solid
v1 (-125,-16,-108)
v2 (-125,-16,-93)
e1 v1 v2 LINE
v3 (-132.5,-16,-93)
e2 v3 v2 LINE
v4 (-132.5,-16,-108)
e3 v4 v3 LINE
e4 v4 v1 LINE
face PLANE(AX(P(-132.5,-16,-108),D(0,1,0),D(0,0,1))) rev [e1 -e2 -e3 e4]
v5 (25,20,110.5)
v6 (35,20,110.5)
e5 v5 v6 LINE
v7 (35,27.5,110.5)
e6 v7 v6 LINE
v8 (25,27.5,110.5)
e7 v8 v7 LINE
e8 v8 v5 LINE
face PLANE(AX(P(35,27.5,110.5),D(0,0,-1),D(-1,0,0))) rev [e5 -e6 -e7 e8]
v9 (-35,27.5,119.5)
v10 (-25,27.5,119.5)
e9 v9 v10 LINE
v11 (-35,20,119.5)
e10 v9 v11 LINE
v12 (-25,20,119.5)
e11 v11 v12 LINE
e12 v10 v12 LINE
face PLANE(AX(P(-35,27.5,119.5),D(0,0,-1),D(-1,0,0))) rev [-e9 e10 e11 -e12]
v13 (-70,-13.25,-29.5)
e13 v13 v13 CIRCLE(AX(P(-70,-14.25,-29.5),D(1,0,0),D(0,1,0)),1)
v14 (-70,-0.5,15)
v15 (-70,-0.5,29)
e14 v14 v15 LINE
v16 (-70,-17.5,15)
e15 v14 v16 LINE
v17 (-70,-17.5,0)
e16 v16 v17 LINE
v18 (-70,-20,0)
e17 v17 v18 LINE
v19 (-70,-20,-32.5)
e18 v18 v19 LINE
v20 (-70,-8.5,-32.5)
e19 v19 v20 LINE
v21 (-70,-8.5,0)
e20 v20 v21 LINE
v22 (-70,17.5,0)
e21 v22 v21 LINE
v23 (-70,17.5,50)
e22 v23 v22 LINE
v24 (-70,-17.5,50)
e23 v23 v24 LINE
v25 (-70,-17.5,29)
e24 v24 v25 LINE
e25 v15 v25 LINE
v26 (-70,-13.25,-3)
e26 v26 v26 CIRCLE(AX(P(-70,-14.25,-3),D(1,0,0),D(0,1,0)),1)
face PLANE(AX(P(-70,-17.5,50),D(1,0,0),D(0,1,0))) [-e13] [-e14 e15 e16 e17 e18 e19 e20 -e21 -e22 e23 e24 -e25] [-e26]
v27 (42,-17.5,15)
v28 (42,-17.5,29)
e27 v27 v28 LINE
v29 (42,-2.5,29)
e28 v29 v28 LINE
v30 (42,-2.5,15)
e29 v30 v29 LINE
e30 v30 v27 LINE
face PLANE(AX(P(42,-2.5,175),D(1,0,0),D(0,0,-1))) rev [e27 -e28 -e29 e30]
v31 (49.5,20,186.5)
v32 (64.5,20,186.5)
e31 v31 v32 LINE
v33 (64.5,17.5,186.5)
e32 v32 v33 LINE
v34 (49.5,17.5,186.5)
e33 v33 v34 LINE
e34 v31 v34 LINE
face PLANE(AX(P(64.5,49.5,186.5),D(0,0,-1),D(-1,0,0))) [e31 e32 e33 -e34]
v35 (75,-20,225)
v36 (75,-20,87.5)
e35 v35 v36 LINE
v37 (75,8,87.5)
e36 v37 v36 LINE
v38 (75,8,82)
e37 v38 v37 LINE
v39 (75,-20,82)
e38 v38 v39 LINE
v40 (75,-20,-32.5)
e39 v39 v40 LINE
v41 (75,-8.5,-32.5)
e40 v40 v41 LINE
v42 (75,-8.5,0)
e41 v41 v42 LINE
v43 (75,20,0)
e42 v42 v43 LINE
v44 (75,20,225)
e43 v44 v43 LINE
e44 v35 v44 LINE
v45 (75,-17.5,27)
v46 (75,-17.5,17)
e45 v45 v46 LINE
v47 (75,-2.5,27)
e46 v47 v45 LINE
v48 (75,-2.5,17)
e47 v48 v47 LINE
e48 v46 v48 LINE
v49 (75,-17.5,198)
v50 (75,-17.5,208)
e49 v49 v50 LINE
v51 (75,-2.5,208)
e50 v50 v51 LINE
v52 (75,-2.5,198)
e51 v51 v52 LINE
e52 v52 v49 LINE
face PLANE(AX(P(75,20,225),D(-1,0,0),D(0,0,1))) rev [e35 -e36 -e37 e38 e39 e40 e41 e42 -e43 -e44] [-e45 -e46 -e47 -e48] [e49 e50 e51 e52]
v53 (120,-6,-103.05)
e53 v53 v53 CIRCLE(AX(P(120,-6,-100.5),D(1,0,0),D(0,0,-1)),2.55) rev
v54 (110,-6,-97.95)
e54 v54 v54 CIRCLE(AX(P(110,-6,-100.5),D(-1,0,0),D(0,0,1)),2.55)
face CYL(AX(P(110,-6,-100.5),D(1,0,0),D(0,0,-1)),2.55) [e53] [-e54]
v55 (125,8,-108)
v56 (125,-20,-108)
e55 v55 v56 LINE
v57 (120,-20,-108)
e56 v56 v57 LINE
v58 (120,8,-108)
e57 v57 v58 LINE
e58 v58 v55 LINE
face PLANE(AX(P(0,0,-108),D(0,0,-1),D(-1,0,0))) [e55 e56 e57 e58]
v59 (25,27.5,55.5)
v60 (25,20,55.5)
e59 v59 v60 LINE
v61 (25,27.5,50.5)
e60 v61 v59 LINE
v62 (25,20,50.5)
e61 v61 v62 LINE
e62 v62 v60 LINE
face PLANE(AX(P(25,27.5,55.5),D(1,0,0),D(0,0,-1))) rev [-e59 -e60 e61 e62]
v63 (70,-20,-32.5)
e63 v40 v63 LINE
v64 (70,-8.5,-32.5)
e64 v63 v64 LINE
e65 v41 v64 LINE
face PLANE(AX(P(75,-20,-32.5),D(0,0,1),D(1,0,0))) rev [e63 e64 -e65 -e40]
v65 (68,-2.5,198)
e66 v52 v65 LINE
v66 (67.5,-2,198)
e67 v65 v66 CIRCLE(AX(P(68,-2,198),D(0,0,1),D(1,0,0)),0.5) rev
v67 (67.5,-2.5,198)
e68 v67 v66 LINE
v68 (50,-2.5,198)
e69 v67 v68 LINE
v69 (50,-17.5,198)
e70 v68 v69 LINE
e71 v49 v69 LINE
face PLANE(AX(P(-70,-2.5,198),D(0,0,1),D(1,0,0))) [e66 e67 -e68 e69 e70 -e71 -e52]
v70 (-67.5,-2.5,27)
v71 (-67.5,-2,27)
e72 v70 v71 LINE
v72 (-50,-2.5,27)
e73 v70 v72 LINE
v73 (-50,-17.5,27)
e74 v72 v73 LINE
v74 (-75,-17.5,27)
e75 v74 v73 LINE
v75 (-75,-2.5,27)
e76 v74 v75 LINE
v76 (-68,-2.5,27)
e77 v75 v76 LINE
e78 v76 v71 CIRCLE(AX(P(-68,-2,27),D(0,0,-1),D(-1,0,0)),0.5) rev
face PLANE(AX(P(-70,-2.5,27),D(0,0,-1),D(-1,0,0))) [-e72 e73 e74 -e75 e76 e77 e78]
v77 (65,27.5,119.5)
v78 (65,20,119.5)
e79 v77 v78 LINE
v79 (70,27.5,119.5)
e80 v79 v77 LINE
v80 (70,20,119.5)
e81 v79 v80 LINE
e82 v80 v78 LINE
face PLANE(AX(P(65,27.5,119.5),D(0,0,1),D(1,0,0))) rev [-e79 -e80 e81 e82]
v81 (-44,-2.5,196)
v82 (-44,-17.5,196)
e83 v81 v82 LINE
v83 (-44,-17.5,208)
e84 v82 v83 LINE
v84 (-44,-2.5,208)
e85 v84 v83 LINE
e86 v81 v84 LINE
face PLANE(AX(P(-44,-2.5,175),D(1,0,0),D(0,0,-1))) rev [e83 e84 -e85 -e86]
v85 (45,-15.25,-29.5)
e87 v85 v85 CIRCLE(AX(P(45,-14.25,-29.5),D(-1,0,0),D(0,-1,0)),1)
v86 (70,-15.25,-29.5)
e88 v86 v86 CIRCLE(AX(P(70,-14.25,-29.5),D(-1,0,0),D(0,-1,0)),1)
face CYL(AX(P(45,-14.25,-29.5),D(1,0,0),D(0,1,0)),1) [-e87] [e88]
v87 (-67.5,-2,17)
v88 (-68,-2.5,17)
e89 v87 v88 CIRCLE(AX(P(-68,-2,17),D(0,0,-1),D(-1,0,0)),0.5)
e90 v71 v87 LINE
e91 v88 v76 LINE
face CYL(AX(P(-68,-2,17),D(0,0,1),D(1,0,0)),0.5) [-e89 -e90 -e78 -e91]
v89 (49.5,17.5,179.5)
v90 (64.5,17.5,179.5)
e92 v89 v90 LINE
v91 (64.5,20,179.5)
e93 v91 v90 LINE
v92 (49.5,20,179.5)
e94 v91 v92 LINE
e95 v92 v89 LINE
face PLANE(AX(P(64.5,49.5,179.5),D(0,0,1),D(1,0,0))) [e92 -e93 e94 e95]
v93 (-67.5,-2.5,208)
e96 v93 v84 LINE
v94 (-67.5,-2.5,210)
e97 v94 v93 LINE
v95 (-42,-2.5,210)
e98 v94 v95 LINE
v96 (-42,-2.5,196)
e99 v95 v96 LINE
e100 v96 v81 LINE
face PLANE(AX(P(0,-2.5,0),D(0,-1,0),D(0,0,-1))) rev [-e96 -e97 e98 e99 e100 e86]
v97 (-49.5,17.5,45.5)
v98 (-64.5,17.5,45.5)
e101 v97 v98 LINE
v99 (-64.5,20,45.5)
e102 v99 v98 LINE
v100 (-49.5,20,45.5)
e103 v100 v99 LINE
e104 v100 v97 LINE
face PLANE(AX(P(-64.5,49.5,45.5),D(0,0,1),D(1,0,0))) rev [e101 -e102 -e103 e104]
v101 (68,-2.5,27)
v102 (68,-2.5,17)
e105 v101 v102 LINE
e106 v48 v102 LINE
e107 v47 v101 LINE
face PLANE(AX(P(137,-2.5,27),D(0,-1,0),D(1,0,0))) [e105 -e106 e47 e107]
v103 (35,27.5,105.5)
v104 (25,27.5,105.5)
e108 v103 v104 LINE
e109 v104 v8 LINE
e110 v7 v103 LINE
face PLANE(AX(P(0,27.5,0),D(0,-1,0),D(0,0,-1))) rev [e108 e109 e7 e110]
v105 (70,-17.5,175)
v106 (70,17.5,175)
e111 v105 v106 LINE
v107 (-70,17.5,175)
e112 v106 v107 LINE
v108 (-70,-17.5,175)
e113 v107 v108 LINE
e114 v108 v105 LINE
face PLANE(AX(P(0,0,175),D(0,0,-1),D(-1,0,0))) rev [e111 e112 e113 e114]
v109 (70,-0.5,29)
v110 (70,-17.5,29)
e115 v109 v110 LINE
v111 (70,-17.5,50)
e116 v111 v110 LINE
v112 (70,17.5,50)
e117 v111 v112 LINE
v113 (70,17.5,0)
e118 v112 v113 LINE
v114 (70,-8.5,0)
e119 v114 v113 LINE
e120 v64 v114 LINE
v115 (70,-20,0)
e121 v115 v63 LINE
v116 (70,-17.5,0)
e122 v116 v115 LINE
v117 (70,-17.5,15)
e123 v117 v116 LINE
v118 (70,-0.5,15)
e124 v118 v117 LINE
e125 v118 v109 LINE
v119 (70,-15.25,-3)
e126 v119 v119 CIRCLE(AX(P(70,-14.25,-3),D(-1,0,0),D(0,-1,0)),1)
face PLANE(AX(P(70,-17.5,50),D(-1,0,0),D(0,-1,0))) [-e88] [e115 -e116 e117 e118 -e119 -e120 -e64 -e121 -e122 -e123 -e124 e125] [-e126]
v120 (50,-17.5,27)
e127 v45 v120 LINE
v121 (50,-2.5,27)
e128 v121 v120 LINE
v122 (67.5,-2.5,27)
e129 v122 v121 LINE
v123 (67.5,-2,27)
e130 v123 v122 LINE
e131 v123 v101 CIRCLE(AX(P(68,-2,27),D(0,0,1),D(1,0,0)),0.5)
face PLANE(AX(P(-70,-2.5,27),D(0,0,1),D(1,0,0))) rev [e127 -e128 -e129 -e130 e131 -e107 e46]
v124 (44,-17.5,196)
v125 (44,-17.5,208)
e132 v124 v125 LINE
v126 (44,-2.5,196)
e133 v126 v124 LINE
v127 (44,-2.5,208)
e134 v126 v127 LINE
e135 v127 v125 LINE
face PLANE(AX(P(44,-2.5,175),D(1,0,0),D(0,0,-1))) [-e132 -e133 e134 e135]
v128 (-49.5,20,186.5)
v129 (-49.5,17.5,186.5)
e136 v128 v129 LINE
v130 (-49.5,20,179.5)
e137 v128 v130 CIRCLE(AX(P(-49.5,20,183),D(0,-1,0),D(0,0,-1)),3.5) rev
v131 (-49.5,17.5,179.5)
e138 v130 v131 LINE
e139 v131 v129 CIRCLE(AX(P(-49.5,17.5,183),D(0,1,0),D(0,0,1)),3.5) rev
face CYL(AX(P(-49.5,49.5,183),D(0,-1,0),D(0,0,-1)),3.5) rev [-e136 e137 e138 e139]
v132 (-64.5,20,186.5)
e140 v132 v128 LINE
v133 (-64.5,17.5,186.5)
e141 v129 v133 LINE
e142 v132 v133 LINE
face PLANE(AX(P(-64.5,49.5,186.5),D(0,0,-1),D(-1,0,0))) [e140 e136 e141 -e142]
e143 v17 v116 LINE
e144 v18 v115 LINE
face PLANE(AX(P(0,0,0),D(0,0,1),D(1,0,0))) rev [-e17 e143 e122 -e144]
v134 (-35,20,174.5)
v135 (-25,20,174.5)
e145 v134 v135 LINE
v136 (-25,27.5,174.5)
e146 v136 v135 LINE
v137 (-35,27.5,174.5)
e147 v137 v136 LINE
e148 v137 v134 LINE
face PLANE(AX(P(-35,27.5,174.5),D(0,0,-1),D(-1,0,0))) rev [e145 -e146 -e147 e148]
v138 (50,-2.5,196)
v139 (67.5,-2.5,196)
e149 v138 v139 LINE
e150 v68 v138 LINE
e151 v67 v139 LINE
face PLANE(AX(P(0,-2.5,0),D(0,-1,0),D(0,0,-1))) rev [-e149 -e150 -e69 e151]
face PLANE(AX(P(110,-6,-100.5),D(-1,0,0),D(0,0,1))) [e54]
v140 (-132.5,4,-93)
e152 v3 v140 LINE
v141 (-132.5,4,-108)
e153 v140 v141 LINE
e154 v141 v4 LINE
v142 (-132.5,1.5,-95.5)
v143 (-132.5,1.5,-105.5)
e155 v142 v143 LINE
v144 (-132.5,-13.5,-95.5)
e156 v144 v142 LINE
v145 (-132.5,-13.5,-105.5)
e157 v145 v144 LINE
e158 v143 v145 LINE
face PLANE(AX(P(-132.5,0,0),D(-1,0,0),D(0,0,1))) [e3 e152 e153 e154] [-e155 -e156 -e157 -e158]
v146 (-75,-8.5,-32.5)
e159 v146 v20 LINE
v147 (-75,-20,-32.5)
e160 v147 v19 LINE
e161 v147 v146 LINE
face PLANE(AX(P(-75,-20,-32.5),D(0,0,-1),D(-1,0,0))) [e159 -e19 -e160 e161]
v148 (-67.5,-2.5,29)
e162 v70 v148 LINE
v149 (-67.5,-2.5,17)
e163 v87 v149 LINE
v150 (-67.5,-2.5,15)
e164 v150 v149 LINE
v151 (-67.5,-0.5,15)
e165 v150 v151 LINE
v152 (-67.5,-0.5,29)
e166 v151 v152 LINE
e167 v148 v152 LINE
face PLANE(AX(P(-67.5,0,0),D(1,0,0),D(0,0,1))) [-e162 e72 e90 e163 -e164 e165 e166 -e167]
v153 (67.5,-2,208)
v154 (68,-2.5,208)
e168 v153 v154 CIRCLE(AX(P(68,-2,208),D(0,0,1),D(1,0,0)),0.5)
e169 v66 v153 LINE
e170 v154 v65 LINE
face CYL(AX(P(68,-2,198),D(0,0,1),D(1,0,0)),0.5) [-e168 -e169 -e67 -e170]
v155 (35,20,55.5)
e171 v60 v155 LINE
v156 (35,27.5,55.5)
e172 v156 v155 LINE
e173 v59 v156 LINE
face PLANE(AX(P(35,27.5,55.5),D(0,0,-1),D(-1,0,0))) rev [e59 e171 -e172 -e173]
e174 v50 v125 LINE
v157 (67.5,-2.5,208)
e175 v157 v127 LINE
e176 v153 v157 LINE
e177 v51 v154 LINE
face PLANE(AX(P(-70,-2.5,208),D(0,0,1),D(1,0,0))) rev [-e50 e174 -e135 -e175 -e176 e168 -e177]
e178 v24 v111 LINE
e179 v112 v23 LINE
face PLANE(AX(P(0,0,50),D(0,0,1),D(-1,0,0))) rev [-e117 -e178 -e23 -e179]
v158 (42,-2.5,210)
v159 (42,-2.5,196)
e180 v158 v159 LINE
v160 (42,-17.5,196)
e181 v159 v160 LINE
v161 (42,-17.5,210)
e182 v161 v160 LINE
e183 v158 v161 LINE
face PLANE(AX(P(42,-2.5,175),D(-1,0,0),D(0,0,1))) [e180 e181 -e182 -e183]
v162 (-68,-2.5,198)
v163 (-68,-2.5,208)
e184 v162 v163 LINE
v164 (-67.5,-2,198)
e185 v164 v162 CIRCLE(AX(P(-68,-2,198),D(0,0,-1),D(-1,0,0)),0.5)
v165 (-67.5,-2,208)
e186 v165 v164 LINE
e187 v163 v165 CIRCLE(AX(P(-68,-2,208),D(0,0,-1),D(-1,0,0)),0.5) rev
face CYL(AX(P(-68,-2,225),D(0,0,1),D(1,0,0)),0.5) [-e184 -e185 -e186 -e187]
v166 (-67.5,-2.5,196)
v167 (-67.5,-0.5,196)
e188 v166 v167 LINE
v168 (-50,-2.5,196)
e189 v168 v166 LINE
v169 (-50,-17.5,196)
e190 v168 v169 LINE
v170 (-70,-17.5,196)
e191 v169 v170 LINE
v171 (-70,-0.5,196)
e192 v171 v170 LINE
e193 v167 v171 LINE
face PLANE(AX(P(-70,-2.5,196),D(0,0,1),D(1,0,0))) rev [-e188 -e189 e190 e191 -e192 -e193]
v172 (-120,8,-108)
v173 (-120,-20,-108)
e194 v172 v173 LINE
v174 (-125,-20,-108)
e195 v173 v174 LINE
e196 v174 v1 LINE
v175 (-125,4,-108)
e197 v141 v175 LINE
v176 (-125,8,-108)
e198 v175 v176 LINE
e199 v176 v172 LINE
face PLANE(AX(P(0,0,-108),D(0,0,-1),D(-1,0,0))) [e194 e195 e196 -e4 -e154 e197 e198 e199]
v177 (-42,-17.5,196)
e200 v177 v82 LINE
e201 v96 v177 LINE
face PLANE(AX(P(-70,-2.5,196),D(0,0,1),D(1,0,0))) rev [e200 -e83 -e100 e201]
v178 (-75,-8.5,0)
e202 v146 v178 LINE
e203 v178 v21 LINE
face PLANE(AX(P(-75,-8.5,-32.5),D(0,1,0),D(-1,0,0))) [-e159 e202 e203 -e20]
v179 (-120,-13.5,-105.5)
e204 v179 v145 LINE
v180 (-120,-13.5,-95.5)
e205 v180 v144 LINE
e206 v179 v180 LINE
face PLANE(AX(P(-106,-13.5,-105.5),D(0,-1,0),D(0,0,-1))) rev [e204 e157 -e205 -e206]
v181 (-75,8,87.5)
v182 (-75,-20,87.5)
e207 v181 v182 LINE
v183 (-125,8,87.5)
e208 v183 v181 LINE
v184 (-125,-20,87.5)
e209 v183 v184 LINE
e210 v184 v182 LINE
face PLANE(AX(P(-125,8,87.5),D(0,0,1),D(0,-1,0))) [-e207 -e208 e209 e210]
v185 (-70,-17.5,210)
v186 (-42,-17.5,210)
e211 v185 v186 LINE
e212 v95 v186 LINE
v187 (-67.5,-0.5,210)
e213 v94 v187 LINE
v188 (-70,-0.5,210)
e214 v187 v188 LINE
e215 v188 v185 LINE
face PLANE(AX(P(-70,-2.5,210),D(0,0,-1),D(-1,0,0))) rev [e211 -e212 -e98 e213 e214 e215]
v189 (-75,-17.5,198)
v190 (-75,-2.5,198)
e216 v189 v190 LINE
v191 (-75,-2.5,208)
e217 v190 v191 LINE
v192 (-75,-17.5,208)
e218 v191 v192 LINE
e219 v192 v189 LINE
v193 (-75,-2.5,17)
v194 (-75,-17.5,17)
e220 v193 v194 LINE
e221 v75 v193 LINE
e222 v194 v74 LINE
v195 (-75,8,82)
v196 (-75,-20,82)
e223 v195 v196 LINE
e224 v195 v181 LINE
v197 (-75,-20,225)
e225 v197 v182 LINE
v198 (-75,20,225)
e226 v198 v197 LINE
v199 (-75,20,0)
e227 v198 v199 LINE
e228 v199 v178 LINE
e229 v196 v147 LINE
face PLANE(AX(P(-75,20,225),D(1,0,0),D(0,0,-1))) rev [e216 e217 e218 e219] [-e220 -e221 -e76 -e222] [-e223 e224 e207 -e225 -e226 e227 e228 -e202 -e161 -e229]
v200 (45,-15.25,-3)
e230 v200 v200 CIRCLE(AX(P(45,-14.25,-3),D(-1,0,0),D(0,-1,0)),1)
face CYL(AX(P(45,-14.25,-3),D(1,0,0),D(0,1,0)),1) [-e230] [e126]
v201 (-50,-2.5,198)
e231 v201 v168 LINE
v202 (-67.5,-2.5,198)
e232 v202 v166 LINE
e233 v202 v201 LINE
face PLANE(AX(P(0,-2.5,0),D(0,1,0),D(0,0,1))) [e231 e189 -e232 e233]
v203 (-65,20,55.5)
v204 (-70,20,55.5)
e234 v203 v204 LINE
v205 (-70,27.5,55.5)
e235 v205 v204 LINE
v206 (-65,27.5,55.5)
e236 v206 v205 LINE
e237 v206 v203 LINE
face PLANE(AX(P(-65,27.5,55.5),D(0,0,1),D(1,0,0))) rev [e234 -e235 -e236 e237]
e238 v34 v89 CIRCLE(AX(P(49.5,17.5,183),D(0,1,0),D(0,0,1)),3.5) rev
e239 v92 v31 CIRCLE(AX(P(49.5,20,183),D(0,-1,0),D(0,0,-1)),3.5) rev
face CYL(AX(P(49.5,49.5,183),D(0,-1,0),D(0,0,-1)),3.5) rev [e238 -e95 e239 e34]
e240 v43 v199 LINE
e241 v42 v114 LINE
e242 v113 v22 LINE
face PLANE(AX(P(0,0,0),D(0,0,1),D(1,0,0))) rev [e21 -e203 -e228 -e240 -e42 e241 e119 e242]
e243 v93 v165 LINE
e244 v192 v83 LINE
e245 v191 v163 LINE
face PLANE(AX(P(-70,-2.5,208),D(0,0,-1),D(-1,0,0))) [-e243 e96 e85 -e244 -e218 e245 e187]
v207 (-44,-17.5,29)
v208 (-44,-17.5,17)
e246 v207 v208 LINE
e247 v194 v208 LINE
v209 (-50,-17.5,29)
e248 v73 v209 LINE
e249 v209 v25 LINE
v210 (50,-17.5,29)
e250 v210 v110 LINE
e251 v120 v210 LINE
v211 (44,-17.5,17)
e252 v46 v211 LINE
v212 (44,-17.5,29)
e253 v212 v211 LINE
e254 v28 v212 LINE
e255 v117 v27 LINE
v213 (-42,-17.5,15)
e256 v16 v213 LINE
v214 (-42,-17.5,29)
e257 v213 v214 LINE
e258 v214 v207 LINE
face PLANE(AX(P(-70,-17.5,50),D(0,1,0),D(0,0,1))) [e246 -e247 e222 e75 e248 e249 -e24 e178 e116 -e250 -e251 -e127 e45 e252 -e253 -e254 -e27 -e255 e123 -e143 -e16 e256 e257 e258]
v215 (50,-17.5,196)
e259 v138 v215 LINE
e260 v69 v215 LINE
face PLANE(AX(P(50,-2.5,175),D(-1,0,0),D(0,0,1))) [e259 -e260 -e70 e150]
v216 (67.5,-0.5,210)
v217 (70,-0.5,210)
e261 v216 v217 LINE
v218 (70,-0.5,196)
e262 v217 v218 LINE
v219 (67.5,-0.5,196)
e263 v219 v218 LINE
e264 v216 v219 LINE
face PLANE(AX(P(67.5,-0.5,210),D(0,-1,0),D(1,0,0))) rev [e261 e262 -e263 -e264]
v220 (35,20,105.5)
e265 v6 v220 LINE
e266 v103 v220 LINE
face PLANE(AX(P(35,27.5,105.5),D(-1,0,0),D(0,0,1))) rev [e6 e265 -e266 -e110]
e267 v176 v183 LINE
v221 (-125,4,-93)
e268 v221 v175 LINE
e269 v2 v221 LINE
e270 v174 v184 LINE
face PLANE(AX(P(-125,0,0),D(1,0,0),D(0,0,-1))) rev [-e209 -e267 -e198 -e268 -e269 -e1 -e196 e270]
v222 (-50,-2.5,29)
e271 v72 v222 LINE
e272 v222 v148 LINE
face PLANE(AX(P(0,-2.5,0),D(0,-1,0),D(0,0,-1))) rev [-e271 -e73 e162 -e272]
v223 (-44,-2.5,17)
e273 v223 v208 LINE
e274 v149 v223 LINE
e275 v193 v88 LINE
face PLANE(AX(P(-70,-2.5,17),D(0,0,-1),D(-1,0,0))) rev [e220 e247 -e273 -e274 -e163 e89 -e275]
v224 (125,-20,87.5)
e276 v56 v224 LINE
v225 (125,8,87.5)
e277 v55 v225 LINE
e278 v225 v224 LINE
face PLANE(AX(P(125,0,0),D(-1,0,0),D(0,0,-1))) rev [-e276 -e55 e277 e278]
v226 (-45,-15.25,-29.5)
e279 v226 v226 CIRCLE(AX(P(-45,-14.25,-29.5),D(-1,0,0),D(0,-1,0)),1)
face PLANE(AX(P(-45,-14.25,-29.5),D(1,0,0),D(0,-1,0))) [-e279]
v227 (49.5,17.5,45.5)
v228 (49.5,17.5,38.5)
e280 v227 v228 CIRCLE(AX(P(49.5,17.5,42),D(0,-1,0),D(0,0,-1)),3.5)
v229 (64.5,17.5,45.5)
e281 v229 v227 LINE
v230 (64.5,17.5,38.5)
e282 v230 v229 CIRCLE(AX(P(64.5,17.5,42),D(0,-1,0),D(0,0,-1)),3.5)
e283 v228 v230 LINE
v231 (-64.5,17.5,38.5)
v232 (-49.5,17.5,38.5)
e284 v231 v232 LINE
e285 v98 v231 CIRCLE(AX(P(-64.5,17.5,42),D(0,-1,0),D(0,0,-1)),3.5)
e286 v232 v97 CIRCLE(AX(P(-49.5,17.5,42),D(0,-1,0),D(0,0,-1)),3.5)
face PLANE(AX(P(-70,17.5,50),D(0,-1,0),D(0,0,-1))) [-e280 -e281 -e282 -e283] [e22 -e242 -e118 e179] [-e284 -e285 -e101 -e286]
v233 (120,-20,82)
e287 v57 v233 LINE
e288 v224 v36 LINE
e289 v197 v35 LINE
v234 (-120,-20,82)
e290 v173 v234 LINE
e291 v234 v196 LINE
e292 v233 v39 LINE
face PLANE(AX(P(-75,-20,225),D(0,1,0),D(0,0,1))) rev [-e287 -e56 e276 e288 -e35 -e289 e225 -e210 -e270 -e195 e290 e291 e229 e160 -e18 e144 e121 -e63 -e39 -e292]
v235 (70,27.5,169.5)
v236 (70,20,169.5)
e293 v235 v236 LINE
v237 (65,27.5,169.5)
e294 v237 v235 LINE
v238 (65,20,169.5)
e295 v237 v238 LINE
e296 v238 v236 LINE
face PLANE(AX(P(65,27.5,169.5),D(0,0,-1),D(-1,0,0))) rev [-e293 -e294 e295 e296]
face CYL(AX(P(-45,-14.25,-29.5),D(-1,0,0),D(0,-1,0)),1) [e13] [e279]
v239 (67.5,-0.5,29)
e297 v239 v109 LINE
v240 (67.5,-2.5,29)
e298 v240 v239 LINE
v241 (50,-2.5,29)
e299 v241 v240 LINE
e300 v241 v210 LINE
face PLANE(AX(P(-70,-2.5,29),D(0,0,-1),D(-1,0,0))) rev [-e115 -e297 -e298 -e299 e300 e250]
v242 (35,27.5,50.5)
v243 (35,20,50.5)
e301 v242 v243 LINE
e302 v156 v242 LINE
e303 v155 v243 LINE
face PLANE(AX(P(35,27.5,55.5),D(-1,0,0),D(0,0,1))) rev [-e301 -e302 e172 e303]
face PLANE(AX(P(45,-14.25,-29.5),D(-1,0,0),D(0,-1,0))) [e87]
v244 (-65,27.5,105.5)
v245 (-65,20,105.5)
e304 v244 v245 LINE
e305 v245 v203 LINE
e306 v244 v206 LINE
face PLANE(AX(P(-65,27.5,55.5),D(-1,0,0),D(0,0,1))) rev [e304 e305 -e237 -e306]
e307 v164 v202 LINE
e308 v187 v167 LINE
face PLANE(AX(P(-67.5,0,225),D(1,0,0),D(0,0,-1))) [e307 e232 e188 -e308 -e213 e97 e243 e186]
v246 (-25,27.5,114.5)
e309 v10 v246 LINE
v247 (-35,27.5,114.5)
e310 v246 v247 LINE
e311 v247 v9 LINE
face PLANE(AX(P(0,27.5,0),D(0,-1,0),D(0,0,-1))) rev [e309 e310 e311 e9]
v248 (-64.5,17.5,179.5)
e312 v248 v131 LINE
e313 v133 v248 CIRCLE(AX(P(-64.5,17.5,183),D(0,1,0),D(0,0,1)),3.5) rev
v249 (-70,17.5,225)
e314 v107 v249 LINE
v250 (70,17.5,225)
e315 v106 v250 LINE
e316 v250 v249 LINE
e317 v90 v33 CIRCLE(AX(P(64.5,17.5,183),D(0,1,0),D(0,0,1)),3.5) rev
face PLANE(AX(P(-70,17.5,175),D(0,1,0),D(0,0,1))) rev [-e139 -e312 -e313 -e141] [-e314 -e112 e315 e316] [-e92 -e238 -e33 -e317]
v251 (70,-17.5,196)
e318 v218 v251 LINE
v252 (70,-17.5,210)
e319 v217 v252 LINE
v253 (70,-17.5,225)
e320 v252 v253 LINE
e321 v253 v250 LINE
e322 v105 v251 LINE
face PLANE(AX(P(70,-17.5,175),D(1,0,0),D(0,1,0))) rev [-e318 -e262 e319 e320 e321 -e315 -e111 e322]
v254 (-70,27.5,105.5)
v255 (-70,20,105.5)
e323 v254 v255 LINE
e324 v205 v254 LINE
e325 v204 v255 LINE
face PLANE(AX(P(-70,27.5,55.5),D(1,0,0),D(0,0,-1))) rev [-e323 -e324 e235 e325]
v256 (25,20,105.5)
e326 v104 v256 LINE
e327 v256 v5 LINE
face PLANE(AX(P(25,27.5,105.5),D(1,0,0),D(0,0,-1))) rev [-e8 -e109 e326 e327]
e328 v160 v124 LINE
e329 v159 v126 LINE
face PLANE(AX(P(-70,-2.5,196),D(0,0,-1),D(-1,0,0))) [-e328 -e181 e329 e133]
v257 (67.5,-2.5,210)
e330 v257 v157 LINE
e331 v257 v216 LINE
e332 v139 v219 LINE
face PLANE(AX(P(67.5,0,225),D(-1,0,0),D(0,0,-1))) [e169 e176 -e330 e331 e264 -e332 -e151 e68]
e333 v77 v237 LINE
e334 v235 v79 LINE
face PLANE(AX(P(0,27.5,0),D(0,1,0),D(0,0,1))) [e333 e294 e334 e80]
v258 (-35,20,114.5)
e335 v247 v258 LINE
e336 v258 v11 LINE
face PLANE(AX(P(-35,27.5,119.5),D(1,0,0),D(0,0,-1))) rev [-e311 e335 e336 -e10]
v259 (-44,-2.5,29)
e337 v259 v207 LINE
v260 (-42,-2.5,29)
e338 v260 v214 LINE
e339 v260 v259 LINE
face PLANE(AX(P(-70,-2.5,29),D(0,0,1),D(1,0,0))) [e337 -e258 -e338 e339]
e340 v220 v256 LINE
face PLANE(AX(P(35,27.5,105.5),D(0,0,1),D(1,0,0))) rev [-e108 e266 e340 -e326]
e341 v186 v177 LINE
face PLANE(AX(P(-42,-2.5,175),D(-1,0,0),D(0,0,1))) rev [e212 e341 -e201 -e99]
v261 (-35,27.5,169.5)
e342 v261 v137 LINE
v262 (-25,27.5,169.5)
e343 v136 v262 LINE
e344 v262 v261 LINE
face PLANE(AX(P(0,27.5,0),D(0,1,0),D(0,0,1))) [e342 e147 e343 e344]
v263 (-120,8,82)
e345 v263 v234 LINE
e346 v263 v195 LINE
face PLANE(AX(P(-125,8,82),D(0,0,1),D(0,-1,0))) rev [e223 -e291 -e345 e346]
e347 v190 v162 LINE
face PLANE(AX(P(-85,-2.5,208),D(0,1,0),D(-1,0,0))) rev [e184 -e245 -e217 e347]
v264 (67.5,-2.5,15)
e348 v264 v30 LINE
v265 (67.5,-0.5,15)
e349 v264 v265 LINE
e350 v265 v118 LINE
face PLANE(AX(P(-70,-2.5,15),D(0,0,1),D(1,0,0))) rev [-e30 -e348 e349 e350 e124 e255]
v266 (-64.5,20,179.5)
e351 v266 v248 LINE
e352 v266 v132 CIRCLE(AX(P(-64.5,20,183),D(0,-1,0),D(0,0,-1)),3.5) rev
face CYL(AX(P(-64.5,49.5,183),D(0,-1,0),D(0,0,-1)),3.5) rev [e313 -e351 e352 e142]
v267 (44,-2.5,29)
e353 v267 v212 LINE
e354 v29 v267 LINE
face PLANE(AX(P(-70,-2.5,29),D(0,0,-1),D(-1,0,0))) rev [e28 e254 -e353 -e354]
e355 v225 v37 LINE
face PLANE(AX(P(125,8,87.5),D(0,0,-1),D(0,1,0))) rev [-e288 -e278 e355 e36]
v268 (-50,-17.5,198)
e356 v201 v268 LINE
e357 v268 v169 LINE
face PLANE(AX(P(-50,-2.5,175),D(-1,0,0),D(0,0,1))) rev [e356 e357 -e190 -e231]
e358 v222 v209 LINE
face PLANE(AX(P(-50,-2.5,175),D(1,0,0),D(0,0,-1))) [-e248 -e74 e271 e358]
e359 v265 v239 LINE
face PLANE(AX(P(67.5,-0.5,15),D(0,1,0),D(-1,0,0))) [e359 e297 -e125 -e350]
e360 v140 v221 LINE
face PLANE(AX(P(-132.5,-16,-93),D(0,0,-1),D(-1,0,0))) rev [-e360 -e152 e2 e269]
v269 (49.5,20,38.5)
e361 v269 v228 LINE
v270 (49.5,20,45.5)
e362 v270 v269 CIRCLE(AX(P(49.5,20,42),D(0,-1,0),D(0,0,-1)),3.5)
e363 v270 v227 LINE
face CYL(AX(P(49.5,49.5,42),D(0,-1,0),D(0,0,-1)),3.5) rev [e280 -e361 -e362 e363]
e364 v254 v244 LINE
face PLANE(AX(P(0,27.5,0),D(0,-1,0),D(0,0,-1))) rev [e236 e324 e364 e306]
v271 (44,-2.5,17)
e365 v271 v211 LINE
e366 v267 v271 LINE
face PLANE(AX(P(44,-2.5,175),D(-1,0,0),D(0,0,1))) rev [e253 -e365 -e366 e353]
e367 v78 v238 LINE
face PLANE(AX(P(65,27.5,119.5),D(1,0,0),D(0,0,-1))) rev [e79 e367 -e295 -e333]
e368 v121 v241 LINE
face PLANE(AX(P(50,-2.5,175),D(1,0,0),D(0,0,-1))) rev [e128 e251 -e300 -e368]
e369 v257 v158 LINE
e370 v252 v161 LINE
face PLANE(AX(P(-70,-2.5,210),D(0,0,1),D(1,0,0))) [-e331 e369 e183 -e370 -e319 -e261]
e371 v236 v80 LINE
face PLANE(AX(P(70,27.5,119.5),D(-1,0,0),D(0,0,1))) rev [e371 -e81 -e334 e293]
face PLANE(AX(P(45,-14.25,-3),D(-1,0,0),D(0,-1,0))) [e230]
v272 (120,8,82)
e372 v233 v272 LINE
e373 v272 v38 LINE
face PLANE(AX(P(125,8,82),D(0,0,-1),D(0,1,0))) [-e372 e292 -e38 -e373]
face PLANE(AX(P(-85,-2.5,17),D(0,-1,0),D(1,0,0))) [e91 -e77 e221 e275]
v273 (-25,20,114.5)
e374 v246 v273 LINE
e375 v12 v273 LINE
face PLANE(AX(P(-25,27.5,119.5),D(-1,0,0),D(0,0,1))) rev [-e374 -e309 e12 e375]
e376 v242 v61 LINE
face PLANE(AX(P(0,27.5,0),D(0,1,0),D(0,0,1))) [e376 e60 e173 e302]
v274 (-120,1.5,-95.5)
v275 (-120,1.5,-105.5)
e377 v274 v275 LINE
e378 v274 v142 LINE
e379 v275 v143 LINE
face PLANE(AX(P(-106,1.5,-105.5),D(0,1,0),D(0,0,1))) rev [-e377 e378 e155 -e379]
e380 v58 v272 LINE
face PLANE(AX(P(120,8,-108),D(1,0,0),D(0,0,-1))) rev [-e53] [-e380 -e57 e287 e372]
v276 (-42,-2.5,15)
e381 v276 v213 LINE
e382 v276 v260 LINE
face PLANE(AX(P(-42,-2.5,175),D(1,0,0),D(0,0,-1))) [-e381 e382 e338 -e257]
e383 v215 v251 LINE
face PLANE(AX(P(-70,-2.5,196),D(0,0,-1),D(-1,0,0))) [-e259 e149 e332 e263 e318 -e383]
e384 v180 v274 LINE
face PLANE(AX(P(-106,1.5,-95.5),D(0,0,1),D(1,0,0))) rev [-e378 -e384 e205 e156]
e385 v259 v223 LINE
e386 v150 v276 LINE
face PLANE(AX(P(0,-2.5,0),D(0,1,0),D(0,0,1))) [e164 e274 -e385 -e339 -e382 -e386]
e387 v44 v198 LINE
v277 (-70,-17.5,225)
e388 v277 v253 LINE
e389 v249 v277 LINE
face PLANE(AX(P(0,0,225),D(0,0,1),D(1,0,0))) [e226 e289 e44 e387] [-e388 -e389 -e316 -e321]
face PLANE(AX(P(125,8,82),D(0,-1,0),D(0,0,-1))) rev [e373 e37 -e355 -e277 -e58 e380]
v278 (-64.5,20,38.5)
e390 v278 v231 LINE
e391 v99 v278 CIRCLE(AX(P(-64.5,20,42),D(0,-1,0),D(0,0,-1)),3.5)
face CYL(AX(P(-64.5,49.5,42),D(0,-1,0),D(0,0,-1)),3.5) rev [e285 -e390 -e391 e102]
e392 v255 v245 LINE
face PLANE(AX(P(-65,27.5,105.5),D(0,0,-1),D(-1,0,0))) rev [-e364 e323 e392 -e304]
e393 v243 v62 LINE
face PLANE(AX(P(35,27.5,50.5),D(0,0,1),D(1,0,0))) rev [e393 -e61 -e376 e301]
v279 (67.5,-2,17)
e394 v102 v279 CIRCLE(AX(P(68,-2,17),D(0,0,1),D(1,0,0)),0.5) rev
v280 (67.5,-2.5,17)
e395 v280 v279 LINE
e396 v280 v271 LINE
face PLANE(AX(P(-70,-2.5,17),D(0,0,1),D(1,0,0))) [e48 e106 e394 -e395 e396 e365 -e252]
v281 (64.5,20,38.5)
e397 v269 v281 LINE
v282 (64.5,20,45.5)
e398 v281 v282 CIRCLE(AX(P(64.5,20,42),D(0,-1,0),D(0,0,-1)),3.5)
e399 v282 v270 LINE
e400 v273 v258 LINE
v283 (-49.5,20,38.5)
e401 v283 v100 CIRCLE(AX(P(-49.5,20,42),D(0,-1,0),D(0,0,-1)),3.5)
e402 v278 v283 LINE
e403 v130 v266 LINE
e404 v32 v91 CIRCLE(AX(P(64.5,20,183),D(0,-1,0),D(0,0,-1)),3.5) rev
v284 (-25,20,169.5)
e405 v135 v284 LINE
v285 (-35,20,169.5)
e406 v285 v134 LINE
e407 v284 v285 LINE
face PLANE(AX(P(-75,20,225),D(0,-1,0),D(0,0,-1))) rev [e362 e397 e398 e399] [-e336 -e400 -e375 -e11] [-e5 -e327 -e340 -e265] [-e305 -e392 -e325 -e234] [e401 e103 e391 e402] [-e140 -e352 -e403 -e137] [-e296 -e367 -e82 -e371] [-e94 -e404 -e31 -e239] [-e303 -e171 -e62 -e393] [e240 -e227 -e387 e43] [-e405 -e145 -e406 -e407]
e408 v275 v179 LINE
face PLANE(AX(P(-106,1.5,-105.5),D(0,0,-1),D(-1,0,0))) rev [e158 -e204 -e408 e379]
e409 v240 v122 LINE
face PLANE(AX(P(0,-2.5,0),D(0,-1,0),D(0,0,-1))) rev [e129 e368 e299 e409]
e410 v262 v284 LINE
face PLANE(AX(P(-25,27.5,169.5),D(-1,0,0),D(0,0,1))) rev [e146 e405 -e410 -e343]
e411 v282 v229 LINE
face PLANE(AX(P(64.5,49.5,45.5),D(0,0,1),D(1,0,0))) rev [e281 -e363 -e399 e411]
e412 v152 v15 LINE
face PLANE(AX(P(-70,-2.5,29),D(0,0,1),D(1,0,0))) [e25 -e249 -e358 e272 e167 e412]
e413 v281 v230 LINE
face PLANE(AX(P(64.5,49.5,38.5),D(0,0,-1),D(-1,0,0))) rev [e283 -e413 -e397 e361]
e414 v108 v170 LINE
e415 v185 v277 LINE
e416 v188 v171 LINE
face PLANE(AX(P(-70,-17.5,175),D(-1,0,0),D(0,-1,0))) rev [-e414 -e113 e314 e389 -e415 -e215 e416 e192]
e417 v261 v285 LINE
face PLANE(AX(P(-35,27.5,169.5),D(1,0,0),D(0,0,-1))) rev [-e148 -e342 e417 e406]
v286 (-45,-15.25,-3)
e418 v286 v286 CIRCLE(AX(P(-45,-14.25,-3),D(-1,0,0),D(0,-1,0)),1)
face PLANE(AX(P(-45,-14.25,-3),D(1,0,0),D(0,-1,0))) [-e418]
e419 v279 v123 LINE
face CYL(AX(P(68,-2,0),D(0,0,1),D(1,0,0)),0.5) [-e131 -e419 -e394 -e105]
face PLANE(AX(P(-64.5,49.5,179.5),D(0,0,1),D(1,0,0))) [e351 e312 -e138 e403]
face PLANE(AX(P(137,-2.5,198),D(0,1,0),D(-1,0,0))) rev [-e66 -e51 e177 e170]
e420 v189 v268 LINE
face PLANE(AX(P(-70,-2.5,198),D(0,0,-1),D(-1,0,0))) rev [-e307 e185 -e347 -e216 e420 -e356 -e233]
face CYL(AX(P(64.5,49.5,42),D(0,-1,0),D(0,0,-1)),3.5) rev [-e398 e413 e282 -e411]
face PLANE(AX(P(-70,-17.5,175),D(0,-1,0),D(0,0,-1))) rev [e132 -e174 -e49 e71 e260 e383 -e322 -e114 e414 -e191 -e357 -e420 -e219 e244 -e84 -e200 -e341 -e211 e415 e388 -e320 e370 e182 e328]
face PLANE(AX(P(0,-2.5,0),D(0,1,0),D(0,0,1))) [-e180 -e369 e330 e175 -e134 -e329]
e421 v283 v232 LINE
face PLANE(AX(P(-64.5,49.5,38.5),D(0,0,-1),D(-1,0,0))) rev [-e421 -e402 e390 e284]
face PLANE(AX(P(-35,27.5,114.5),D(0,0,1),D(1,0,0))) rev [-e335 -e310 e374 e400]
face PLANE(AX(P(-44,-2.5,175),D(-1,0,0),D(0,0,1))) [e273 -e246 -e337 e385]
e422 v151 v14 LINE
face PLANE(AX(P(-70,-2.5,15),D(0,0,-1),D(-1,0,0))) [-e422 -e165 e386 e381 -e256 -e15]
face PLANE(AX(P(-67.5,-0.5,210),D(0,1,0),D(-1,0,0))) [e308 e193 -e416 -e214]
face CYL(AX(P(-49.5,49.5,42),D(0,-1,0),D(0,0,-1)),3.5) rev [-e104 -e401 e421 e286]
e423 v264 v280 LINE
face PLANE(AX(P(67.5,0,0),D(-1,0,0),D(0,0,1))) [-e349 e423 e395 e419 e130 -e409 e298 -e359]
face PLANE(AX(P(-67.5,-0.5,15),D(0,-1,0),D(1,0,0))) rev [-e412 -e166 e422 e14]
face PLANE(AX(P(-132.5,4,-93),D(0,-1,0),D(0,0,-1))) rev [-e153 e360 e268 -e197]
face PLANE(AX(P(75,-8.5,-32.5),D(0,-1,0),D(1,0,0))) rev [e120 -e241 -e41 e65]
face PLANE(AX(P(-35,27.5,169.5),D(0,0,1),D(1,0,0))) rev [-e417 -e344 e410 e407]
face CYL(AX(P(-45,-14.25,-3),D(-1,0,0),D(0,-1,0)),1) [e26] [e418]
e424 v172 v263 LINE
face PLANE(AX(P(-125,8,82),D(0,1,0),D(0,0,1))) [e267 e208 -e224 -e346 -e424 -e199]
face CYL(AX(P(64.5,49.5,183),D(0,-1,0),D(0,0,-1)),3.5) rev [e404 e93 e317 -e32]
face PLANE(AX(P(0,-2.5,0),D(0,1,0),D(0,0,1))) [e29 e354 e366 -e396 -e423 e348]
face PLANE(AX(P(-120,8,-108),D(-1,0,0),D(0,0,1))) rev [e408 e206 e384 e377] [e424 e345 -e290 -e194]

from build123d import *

# Parameters (mm, degrees)
SKETCH2_W            = 150
SKETCH2_H            = 40
BOSS_EXTRUDE1_DEPTH  = 225
SKETCH3_W            = 140
SKETCH3_H            = 35
CUT_EXTRUDE1_DEPTH   = 50
SKETCH4_W            = 26
SKETCH4_H            = 2
SKETCH4_W_2          = 20
BOSS_EXTRUDE2_DEPTH  = 15
SKETCH6_W            = 10
SKETCH6_H            = 15
CUT_EXTRUDE2_DEPTH   = 15
CUT_EXTRUDE3_DEPTH   = 67
SKETCH9_W            = 10
SKETCH9_H            = 15
CUT_EXTRUDE4_DEPTH   = 67
SKETCH12_W           = 14
SKETCH12_H           = 2
BOSS_EXTRUDE3_DEPTH  = 2.5
FILLET1_R            = 0.5
MIRROR3_START        = 196
MIRROR3_DEPTH        = 14
MIRROR3_START_2      = 15
MIRROR3_2_DEPTH      = 14
MIRROR3_3_DEPTH      = 2
MIRROR3_START_3      = 208
MIRROR3_4_DEPTH      = 2
MIRROR3_5_DEPTH      = 2
MIRROR3_START_4      = 27
MIRROR3_6_DEPTH      = 2
SKETCH16_W           = 32.5
SKETCH16_H           = 11.5
BOSS_EXTRUDE5_DEPTH  = 5
SKETCH17_R           = 1
BOSS_EXTRUDE7_DEPTH  = 25
SKETCH18_W           = 5
SKETCH18_H           = 50
SKETCH18_W_2         = 10
SKETCH18_H_2         = 5
BOSS_EXTRUDE8_DEPTH  = 7.5
SKETCH24_W           = 5.5
SKETCH24_H           = 28
BOSS_EXTRUDE11_DEPTH = 50
SKETCH25_W           = 5
SKETCH25_H           = 28
BOSS_EXTRUDE12_DEPTH = 190
SKETCH26_W           = 5
SKETCH26_H           = 28
BOSS_EXTRUDE13_DEPTH = 190
SKETCH27_R           = 2.55
BOSS_EXTRUDE14_DEPTH = 10
SKETCH29_W           = 10
SKETCH29_H           = 15
CUT_EXTRUDE5_DEPTH   = 19
SKETCH30_W           = 15
SKETCH30_H           = 20
BOSS_EXTRUDE15_DEPTH = 7.5
SKETCH32_W           = 10
SKETCH32_H           = 15
CUT_EXTRUDE6_DEPTH   = 19


# Read off the part's stored shape, not the designer's step: Mirror3
with BuildPart() as part:
    # Sketch2 → Boss-Extrude1 (new body)
    with BuildSketch(Plane.XY):
        Rectangle(SKETCH2_W, SKETCH2_H)
    extrude(amount=BOSS_EXTRUDE1_DEPTH)

    # Sketch3 → Cut-Extrude1 (cut)
    with BuildSketch(Plane.XY.offset(225)):
        Rectangle(SKETCH3_W, SKETCH3_H)
    cut_extrude1 = extrude(amount=-CUT_EXTRUDE1_DEPTH, mode=Mode.SUBTRACT)

    # Sketch4 → Boss-Extrude2 (add)
    with BuildSketch(Plane(origin=(0, -17.5, 0), x_dir=(1, 0, 0), z_dir=(0, 1, 0))):
        Polygon((-42, -196), (-44, -196), (-44, -208), (-44, -210), (-42, -210), align=None)
        with Locations((-57, -209)):
            Rectangle(SKETCH4_W, SKETCH4_H)
        with Locations((-60, -197)):
            Rectangle(SKETCH4_W_2, SKETCH4_H)
        Polygon((70, -210), (70, -208), (44, -208), (44, -196), (42, -196), (42, -210), (44, -210), align=None)
        with Locations((60, -197)):
            Rectangle(SKETCH4_W_2, SKETCH4_H)
    boss_extrude2 = extrude(amount=BOSS_EXTRUDE2_DEPTH)

    # Sketch6 → Cut-Extrude2 (cut)
    with BuildSketch(Plane(origin=(-70, 0, 0), x_dir=(0, 0, -1), z_dir=(1, 0, 0))):
        with Locations((-203, -10)):
            Rectangle(SKETCH6_W, SKETCH6_H)
    cut_extrude2 = extrude(amount=-CUT_EXTRUDE2_DEPTH, mode=Mode.SUBTRACT)

    # Sketch8 → Cut-Extrude3 (cut)
    with BuildSketch(Plane(origin=(0, -17.5, 0), x_dir=(1, 0, 0), z_dir=(0, 1, 0))):
        with BuildLine():
            Line((-64.5, -179.5), (-49.5, -179.5))
            ThreePointArc((-49.5, -179.5), (-46, -183), (-49.5, -186.5))
            Line((-49.5, -186.5), (-64.5, -186.5))
            ThreePointArc((-64.5, -186.5), (-68, -183), (-64.5, -179.5))
        make_face()
        with BuildLine():
            Line((64.5, -179.5), (49.5, -179.5))
            ThreePointArc((49.5, -179.5), (46, -183), (49.5, -186.5))
            Line((49.5, -186.5), (64.5, -186.5))
            ThreePointArc((64.5, -186.5), (68, -183), (64.5, -179.5))
        make_face()
    cut_extrude3 = extrude(amount=CUT_EXTRUDE3_DEPTH, mode=Mode.SUBTRACT)

    # Sketch9 → Cut-Extrude4 (cut)
    with BuildSketch(Plane.ZY.offset(-70)):
        with Locations((203, -10)):
            Rectangle(SKETCH9_W, SKETCH9_H)
    cut_extrude4 = extrude(amount=-CUT_EXTRUDE4_DEPTH, mode=Mode.SUBTRACT)

    # Mirror1: Cut-Extrude1, Boss-Extrude2, Cut-Extrude2, Cut-Extrude3, Cut-Extrude4 across plane
    add(cut_extrude1.mirror(Plane.XY.offset(112.5)), mode=Mode.SUBTRACT)
    add(boss_extrude2.mirror(Plane.XY.offset(112.5)))
    add(cut_extrude2.mirror(Plane.XY.offset(112.5)), mode=Mode.SUBTRACT)
    add(cut_extrude3.mirror(Plane.XY.offset(112.5)), mode=Mode.SUBTRACT)
    add(cut_extrude4.mirror(Plane.XY.offset(112.5)), mode=Mode.SUBTRACT)

    # Sketch12 → Boss-Extrude3 (add)
    with BuildSketch(Plane.ZY.offset(-70)):
        with Locations((22, -1.5)):
            Rectangle(SKETCH12_W, SKETCH12_H)
    extrude(amount=BOSS_EXTRUDE3_DEPTH)

    # Fillet1
    fillet1_edges = [part.edges().sort_by_distance(p)[0] for p in [
        (67.5, -2.5, 22),
    ]]
    fillet(fillet1_edges, radius=FILLET1_R)

    # Mirror3 outline → Mirror3 (add)
    with BuildSketch(Plane.XY.offset(MIRROR3_START)):
        with BuildLine():
            Line((-70, -2.5), (-68, -2.5))
            ThreePointArc((-68, -2.5), (-67.646446609, -2.353553391), (-67.5, -2))
            Line((-67.5, -2), (-67.5, -0.5))
            Line((-67.5, -0.5), (-70, -0.5))
            Line((-70, -0.5), (-70, -2.5))
        make_face()
        with BuildLine():
            Line((68, -2.5), (70, -2.5))
            Line((70, -2.5), (70, -0.5))
            Line((70, -0.5), (67.5, -0.5))
            Line((67.5, -0.5), (67.5, -2))
            ThreePointArc((67.5, -2), (67.646446609, -2.353553391), (68, -2.5))
        make_face()
    extrude(amount=MIRROR3_DEPTH)

    # Mirror3 2 outline → Mirror3 2 (add)
    with BuildSketch(Plane.XY.offset(MIRROR3_START_2)):
        with BuildLine():
            Line((-70, -2.5), (-68, -2.5))
            ThreePointArc((-68, -2.5), (-67.646446609, -2.353553391), (-67.5, -2))
            Line((-67.5, -2), (-67.5, -0.5))
            Line((-67.5, -0.5), (-70, -0.5))
            Line((-70, -0.5), (-70, -2.5))
        make_face()
    extrude(amount=MIRROR3_2_DEPTH)

    # Mirror3 3 outline → Mirror3 3 (add)
    with BuildSketch(Plane.XY.offset(MIRROR3_START)):
        with BuildLine():
            ThreePointArc((-67.5, -2), (-67.646446609, -2.353553391), (-68, -2.5))
            Line((-68, -2.5), (-67.5, -2.5))
            Line((-67.5, -2.5), (-67.5, -2))
        make_face()
        with BuildLine():
            Line((67.5, -2.5), (68, -2.5))
            ThreePointArc((68, -2.5), (67.646446609, -2.353553391), (67.5, -2))
            Line((67.5, -2), (67.5, -2.5))
        make_face()
    extrude(amount=MIRROR3_3_DEPTH)

    # Mirror3 4 outline → Mirror3 4 (add)
    with BuildSketch(Plane.XY.offset(MIRROR3_START_3)):
        with BuildLine():
            ThreePointArc((-67.5, -2), (-67.646446609, -2.353553391), (-68, -2.5))
            Line((-68, -2.5), (-67.5, -2.5))
            Line((-67.5, -2.5), (-67.5, -2))
        make_face()
        with BuildLine():
            Line((67.5, -2.5), (68, -2.5))
            ThreePointArc((68, -2.5), (67.646446609, -2.353553391), (67.5, -2))
            Line((67.5, -2), (67.5, -2.5))
        make_face()
    extrude(amount=MIRROR3_4_DEPTH)

    # Mirror3 5 outline → Mirror3 5 (add)
    with BuildSketch(Plane.XY.offset(MIRROR3_START_2)):
        with BuildLine():
            ThreePointArc((-67.5, -2), (-67.646446609, -2.353553391), (-68, -2.5))
            Line((-68, -2.5), (-67.5, -2.5))
            Line((-67.5, -2.5), (-67.5, -2))
        make_face()
    extrude(amount=MIRROR3_5_DEPTH)

    # Mirror3 6 outline → Mirror3 6 (add)
    with BuildSketch(Plane.XY.offset(MIRROR3_START_4)):
        with BuildLine():
            ThreePointArc((-67.5, -2), (-67.646446609, -2.353553391), (-68, -2.5))
            Line((-68, -2.5), (-67.5, -2.5))
            Line((-67.5, -2.5), (-67.5, -2))
        make_face()
    extrude(amount=MIRROR3_6_DEPTH)

    # Sketch16 → Boss-Extrude5 (add)
    with BuildSketch(Plane(origin=(-70, 0, 0), x_dir=(0, 0, -1), z_dir=(1, 0, 0))):
        with Locations((16.25, -14.25)):
            Rectangle(SKETCH16_W, SKETCH16_H)
    boss_extrude5 = extrude(amount=-BOSS_EXTRUDE5_DEPTH)

    # Mirror4: Boss-Extrude5 across plane
    add(boss_extrude5.mirror(Plane(origin=(0, 0, 0), x_dir=(0, 0, 1), z_dir=(1, 0, 0))))

    # Sketch17 → Boss-Extrude7 (add)
    with BuildSketch(Plane.ZY.offset(-70)):
        with Locations(Location((-29.5, -14.25, 0), (0, 0, 270))):
            Circle(SKETCH17_R)
        with Locations(Location((-3, -14.25, 0), (0, 0, 270))):
            Circle(SKETCH17_R)
    boss_extrude7 = extrude(amount=BOSS_EXTRUDE7_DEPTH)

    # Mirror5: Boss-Extrude7 across plane
    add(boss_extrude7.mirror(Plane(origin=(0, 0, 0), x_dir=(0, 0, 1), z_dir=(1, 0, 0))))

    # Sketch18 → Boss-Extrude8 (add)
    with BuildSketch(Plane(origin=(0, 20, 0), x_dir=(1, 0, 0), z_dir=(0, 1, 0))):
        with Locations((-67.5, -80.5)):
            Rectangle(SKETCH18_W, SKETCH18_H)
        with Locations((67.5, -144.5)):
            Rectangle(SKETCH18_W, SKETCH18_H)
        with Locations((-30, -172)):
            Rectangle(SKETCH18_W_2, SKETCH18_H_2)
        with Locations((-30, -117)):
            Rectangle(SKETCH18_W_2, SKETCH18_H_2)
        with Locations((30, -108)):
            Rectangle(SKETCH18_W_2, SKETCH18_H_2)
        with Locations((30, -53)):
            Rectangle(SKETCH18_W_2, SKETCH18_H_2)
    extrude(amount=BOSS_EXTRUDE8_DEPTH)

    # Sketch24 → Boss-Extrude11 (add)
    with BuildSketch(Plane.ZY.offset(75)):
        with Locations((84.75, -6)):
            Rectangle(SKETCH24_W, SKETCH24_H)
    boss_extrude11 = extrude(amount=BOSS_EXTRUDE11_DEPTH)

    # Sketch25 → Boss-Extrude12 (add)
    with BuildSketch(Plane(origin=(0, 0, 82), x_dir=(-1, 0, 0), z_dir=(0, 0, -1))):
        with Locations((122.5, -6)):
            Rectangle(SKETCH25_W, SKETCH25_H)
    extrude(amount=BOSS_EXTRUDE12_DEPTH)

    # Mirror12: Boss-Extrude11 across plane
    add(boss_extrude11.mirror(Plane(origin=(0, 0, 0), x_dir=(0, 0, 1), z_dir=(1, 0, 0))))

    # Sketch26 → Boss-Extrude13 (add)
    with BuildSketch(Plane(origin=(0, 0, 82), x_dir=(-1, 0, 0), z_dir=(0, 0, -1))):
        with Locations((-122.5, -6)):
            Rectangle(SKETCH26_W, SKETCH26_H)
    extrude(amount=BOSS_EXTRUDE13_DEPTH)

    # Sketch27 → Boss-Extrude14 (add)
    with BuildSketch(Plane.ZY.offset(-120)):
        with Locations(Location((-100.5, -6, 0), (0, 0, 180))):
            Circle(SKETCH27_R)
    boss_extrude14 = extrude(amount=BOSS_EXTRUDE14_DEPTH)

    # Mirror13: Boss-Extrude14 across plane
    add(boss_extrude14.mirror(Plane(origin=(0, 0, 0), x_dir=(0, 0, 1), z_dir=(1, 0, 0))))

    # Sketch29 → Cut-Extrude5 (cut)
    with BuildSketch(Plane.ZY.offset(125)):
        with Locations((-100.5, -6)):
            Rectangle(SKETCH29_W, SKETCH29_H)
    extrude(amount=-CUT_EXTRUDE5_DEPTH, mode=Mode.SUBTRACT)

    # Sketch30 → Boss-Extrude15 (add)
    with BuildSketch(Plane.ZY.offset(125)):
        with Locations((-100.5, -6)):
            Rectangle(SKETCH30_W, SKETCH30_H)
    extrude(amount=BOSS_EXTRUDE15_DEPTH)

    # Sketch32 → Cut-Extrude6 (cut)
    with BuildSketch(Plane(origin=(-125, 0, 0), x_dir=(0, 0, -1), z_dir=(1, 0, 0))):
        with Locations((100.5, -6)):
            Rectangle(SKETCH32_W, SKETCH32_H)
    extrude(amount=-CUT_EXTRUDE6_DEPTH, mode=Mode.SUBTRACT)


solid = part.part
